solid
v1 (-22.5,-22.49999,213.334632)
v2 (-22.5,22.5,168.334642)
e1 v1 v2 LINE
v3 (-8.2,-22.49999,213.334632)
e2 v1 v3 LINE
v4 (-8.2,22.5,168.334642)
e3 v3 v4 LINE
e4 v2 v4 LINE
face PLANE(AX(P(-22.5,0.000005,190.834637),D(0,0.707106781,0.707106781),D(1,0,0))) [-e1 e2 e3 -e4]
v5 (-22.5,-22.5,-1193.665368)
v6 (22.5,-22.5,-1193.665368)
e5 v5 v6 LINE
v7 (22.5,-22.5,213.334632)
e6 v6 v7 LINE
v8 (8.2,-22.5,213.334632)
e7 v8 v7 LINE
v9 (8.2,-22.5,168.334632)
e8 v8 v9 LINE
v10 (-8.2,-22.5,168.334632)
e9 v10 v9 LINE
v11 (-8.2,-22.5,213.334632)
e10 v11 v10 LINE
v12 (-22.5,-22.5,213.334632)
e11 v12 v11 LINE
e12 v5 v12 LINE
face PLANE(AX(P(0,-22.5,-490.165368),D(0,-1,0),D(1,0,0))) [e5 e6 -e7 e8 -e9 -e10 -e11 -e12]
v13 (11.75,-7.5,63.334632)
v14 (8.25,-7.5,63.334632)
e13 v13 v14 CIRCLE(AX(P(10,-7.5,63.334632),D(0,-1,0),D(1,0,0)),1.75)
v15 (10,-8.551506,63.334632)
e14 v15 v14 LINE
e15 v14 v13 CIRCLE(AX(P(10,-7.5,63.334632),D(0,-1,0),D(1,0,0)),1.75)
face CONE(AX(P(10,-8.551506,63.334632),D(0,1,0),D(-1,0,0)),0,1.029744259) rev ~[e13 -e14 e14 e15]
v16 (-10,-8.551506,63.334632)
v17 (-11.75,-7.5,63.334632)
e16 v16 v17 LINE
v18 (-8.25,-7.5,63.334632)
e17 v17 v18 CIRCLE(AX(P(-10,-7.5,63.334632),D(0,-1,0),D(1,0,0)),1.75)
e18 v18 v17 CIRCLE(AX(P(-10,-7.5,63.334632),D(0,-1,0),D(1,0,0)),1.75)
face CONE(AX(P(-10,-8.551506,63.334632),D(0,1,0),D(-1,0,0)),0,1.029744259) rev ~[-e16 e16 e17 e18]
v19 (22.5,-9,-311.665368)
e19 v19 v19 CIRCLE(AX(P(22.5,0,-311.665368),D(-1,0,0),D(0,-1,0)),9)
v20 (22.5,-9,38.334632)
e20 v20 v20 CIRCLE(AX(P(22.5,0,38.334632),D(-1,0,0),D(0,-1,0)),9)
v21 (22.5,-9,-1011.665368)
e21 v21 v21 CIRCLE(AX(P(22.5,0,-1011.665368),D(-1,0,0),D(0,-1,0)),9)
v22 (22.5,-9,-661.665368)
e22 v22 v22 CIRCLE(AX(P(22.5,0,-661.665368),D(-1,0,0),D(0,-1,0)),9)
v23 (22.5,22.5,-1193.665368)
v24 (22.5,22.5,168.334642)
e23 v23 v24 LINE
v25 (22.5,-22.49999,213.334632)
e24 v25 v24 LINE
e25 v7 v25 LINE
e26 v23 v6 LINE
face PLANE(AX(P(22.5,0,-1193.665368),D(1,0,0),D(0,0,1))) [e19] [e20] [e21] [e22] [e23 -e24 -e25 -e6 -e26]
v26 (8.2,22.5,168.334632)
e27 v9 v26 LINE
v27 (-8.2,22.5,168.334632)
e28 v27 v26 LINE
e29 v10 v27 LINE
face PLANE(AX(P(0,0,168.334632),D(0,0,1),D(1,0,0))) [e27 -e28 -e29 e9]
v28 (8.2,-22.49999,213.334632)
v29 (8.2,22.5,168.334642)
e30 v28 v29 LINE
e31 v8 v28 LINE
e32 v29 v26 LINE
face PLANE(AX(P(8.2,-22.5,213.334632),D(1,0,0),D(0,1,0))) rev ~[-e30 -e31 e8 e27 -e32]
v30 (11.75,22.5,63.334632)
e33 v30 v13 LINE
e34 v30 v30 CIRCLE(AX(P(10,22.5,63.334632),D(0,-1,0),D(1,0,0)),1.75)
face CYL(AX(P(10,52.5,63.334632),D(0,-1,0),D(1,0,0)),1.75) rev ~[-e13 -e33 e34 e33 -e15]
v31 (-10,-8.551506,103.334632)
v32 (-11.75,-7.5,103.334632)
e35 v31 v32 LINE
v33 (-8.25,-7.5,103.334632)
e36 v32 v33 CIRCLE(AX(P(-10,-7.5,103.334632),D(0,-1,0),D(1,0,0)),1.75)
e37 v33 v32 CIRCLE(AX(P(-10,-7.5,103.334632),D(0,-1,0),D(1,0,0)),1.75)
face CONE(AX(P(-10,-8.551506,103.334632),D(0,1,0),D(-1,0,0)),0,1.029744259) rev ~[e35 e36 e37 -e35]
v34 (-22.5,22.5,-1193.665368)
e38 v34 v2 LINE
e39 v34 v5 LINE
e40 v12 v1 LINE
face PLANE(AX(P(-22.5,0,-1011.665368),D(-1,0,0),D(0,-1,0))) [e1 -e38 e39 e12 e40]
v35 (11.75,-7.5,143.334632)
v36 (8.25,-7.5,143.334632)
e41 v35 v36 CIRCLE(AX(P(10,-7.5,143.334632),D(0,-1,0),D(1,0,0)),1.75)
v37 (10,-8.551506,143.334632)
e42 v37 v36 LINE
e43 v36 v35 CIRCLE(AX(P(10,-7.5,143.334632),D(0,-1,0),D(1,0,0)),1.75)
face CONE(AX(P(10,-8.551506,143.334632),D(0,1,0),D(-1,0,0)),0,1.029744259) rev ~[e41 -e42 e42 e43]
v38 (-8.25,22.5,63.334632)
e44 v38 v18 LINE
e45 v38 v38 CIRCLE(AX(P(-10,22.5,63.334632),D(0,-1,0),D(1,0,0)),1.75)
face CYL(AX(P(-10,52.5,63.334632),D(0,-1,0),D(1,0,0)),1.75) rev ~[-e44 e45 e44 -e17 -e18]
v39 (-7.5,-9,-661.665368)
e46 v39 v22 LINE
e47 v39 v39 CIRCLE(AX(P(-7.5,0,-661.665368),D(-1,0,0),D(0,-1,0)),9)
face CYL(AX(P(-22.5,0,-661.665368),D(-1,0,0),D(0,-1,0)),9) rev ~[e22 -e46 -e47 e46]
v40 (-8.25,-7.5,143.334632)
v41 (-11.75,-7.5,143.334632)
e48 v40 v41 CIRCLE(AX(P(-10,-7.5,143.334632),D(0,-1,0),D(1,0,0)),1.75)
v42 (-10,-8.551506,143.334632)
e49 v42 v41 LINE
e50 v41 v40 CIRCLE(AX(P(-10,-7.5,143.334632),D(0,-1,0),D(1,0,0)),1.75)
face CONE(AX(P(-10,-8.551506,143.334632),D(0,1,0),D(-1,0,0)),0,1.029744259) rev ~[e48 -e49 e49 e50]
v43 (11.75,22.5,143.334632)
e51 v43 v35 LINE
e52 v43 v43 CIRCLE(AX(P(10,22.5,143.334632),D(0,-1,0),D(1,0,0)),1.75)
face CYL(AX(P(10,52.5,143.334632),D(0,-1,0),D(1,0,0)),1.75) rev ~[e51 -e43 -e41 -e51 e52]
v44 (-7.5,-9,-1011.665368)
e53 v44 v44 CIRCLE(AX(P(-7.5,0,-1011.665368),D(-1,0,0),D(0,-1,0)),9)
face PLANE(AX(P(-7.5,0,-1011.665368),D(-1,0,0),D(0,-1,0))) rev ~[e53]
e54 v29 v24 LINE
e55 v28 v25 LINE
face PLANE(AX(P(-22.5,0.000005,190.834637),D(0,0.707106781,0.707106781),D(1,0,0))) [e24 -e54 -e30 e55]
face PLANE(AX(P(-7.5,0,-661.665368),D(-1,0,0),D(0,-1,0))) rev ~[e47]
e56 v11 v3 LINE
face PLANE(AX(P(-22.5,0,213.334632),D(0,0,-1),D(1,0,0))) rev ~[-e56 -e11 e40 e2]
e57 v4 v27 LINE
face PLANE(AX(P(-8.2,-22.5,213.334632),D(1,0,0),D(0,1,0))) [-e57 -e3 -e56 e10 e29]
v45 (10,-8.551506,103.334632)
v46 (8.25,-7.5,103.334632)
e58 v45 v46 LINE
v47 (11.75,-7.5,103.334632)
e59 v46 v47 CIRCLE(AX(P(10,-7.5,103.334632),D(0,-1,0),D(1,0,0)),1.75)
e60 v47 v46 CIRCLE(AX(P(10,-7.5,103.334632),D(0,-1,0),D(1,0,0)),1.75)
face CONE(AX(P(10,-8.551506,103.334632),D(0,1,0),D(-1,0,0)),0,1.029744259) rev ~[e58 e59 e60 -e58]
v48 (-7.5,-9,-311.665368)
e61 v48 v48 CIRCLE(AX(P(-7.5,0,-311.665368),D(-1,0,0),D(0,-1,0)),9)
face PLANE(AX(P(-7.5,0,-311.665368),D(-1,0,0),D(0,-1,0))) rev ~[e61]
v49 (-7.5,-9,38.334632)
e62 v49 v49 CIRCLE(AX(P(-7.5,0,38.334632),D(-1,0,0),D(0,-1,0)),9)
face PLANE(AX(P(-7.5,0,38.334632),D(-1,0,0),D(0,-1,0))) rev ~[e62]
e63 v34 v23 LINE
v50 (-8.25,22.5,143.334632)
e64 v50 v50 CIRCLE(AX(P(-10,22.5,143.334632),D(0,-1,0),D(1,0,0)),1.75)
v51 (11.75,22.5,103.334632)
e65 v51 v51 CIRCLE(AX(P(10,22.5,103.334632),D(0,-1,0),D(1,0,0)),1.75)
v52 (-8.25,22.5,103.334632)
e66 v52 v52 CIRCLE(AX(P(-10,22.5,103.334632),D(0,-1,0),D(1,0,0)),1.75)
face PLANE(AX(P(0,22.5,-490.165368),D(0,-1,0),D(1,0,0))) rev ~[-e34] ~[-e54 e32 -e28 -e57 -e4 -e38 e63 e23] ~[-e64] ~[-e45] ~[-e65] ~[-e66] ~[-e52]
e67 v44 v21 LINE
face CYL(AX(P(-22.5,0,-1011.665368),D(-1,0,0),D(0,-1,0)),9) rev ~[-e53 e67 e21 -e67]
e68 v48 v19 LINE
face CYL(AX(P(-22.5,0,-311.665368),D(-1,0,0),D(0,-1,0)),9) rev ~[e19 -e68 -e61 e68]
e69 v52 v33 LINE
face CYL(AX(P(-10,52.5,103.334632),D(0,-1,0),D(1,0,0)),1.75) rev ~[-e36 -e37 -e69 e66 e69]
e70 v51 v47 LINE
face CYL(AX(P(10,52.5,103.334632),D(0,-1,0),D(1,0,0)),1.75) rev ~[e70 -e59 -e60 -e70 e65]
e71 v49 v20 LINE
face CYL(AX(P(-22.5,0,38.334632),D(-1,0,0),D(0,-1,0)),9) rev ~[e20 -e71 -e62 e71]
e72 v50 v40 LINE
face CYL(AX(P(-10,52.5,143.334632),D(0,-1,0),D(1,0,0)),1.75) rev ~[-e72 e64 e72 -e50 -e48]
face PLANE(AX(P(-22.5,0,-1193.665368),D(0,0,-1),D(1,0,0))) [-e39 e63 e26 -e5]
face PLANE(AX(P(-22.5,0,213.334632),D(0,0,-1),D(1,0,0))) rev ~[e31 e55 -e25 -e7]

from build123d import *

# Parameters (mm, degrees)
F0_W     = 45
F0_H     = 1407
F1_DEPTH = 22.5
F3_SIZE2 = 44.99999
F3_SIZE  = 44.99999
F2_W     = 16.4
F2_H     = 45
F4_DEPTH = 45
F5_R     = 9
F6_DEPTH = 45.001
F7_DEPTH = 15
F9_D     = 3.5
F9_DEPTH = 30
F9_TIP   = 1.0515060833


# Not quite as in the source:
# - a fillet or chamfer is up to 0.001 mm smaller than in the source, because OpenCascade refuses the exact size


with BuildPart() as f1:
    # F0 (on Front) → F1 (new body, symmetric)
    with BuildSketch(Plane.XZ):
        with Locations((0, -490.1653682211)):
            Rectangle(F0_W, F0_H)
    extrude(amount=F1_DEPTH, both=True)

    # F3 (size 45 and 45 in the source; OpenCascade refuses exactly that, so slightly less here)
    f3_edges = [f1.edges().sort_by_distance(p)[0] for p in [
        (0, 22.5, 213.334632),
    ]]
    chamfer(f3_edges, length=F3_SIZE, length2=F3_SIZE2)

    # F2 (on face) → F4 (cut)
    with BuildSketch(Plane.XY.offset(213.3346317789)):
        Rectangle(F2_W, F2_H)
    extrude(amount=-F4_DEPTH, mode=Mode.SUBTRACT)

    # F5 (on face) → F6 (cut, through all)
    with BuildSketch(Plane(origin=(-22.5, 0, 0), x_dir=(0, -1, 0), z_dir=(-1, 0, 0))):
        with Locations((0, 38.3346317789)):
            Circle(F5_R)
        with Locations((0, -311.6653682211)):
            Circle(F5_R)
        with Locations((0, -661.6653682211)):
            Circle(F5_R)
        with Locations((0, -1011.6653682211)):
            Circle(F5_R)
    extrude(amount=-F6_DEPTH, mode=Mode.SUBTRACT)

    # F5 (on face) → F7 (join)
    with BuildSketch(Plane(origin=(-22.5, 0, 0), x_dir=(0, -1, 0), z_dir=(-1, 0, 0))):
        with Locations((0, -1011.6653682211)):
            Circle(F5_R)
        with Locations((0, -661.6653682211)):
            Circle(F5_R)
        with Locations((0, -311.6653682211)):
            Circle(F5_R)
        with Locations((0, 38.3346317789)):
            Circle(F5_R)
    extrude(amount=-F7_DEPTH)

    # F9
    with Locations(Plane(origin=(0, 22.5, 0), x_dir=(-1, 0, 0), z_dir=(0, 1, 0))):
        with Locations((10, 143.3346317789), (10, 103.3346317789), (10, 63.3346317789), (-10, 63.3346317789), (-10, 103.3346317789), (-10, 143.3346317789)):
            Hole(F9_D / 2, depth=F9_DEPTH)
            with Locations((0, 0, -(F9_DEPTH + F9_TIP / 2))):  # 118° drill point
                Cone(0, F9_D / 2, F9_TIP, mode=Mode.SUBTRACT)


solid = f1.part
